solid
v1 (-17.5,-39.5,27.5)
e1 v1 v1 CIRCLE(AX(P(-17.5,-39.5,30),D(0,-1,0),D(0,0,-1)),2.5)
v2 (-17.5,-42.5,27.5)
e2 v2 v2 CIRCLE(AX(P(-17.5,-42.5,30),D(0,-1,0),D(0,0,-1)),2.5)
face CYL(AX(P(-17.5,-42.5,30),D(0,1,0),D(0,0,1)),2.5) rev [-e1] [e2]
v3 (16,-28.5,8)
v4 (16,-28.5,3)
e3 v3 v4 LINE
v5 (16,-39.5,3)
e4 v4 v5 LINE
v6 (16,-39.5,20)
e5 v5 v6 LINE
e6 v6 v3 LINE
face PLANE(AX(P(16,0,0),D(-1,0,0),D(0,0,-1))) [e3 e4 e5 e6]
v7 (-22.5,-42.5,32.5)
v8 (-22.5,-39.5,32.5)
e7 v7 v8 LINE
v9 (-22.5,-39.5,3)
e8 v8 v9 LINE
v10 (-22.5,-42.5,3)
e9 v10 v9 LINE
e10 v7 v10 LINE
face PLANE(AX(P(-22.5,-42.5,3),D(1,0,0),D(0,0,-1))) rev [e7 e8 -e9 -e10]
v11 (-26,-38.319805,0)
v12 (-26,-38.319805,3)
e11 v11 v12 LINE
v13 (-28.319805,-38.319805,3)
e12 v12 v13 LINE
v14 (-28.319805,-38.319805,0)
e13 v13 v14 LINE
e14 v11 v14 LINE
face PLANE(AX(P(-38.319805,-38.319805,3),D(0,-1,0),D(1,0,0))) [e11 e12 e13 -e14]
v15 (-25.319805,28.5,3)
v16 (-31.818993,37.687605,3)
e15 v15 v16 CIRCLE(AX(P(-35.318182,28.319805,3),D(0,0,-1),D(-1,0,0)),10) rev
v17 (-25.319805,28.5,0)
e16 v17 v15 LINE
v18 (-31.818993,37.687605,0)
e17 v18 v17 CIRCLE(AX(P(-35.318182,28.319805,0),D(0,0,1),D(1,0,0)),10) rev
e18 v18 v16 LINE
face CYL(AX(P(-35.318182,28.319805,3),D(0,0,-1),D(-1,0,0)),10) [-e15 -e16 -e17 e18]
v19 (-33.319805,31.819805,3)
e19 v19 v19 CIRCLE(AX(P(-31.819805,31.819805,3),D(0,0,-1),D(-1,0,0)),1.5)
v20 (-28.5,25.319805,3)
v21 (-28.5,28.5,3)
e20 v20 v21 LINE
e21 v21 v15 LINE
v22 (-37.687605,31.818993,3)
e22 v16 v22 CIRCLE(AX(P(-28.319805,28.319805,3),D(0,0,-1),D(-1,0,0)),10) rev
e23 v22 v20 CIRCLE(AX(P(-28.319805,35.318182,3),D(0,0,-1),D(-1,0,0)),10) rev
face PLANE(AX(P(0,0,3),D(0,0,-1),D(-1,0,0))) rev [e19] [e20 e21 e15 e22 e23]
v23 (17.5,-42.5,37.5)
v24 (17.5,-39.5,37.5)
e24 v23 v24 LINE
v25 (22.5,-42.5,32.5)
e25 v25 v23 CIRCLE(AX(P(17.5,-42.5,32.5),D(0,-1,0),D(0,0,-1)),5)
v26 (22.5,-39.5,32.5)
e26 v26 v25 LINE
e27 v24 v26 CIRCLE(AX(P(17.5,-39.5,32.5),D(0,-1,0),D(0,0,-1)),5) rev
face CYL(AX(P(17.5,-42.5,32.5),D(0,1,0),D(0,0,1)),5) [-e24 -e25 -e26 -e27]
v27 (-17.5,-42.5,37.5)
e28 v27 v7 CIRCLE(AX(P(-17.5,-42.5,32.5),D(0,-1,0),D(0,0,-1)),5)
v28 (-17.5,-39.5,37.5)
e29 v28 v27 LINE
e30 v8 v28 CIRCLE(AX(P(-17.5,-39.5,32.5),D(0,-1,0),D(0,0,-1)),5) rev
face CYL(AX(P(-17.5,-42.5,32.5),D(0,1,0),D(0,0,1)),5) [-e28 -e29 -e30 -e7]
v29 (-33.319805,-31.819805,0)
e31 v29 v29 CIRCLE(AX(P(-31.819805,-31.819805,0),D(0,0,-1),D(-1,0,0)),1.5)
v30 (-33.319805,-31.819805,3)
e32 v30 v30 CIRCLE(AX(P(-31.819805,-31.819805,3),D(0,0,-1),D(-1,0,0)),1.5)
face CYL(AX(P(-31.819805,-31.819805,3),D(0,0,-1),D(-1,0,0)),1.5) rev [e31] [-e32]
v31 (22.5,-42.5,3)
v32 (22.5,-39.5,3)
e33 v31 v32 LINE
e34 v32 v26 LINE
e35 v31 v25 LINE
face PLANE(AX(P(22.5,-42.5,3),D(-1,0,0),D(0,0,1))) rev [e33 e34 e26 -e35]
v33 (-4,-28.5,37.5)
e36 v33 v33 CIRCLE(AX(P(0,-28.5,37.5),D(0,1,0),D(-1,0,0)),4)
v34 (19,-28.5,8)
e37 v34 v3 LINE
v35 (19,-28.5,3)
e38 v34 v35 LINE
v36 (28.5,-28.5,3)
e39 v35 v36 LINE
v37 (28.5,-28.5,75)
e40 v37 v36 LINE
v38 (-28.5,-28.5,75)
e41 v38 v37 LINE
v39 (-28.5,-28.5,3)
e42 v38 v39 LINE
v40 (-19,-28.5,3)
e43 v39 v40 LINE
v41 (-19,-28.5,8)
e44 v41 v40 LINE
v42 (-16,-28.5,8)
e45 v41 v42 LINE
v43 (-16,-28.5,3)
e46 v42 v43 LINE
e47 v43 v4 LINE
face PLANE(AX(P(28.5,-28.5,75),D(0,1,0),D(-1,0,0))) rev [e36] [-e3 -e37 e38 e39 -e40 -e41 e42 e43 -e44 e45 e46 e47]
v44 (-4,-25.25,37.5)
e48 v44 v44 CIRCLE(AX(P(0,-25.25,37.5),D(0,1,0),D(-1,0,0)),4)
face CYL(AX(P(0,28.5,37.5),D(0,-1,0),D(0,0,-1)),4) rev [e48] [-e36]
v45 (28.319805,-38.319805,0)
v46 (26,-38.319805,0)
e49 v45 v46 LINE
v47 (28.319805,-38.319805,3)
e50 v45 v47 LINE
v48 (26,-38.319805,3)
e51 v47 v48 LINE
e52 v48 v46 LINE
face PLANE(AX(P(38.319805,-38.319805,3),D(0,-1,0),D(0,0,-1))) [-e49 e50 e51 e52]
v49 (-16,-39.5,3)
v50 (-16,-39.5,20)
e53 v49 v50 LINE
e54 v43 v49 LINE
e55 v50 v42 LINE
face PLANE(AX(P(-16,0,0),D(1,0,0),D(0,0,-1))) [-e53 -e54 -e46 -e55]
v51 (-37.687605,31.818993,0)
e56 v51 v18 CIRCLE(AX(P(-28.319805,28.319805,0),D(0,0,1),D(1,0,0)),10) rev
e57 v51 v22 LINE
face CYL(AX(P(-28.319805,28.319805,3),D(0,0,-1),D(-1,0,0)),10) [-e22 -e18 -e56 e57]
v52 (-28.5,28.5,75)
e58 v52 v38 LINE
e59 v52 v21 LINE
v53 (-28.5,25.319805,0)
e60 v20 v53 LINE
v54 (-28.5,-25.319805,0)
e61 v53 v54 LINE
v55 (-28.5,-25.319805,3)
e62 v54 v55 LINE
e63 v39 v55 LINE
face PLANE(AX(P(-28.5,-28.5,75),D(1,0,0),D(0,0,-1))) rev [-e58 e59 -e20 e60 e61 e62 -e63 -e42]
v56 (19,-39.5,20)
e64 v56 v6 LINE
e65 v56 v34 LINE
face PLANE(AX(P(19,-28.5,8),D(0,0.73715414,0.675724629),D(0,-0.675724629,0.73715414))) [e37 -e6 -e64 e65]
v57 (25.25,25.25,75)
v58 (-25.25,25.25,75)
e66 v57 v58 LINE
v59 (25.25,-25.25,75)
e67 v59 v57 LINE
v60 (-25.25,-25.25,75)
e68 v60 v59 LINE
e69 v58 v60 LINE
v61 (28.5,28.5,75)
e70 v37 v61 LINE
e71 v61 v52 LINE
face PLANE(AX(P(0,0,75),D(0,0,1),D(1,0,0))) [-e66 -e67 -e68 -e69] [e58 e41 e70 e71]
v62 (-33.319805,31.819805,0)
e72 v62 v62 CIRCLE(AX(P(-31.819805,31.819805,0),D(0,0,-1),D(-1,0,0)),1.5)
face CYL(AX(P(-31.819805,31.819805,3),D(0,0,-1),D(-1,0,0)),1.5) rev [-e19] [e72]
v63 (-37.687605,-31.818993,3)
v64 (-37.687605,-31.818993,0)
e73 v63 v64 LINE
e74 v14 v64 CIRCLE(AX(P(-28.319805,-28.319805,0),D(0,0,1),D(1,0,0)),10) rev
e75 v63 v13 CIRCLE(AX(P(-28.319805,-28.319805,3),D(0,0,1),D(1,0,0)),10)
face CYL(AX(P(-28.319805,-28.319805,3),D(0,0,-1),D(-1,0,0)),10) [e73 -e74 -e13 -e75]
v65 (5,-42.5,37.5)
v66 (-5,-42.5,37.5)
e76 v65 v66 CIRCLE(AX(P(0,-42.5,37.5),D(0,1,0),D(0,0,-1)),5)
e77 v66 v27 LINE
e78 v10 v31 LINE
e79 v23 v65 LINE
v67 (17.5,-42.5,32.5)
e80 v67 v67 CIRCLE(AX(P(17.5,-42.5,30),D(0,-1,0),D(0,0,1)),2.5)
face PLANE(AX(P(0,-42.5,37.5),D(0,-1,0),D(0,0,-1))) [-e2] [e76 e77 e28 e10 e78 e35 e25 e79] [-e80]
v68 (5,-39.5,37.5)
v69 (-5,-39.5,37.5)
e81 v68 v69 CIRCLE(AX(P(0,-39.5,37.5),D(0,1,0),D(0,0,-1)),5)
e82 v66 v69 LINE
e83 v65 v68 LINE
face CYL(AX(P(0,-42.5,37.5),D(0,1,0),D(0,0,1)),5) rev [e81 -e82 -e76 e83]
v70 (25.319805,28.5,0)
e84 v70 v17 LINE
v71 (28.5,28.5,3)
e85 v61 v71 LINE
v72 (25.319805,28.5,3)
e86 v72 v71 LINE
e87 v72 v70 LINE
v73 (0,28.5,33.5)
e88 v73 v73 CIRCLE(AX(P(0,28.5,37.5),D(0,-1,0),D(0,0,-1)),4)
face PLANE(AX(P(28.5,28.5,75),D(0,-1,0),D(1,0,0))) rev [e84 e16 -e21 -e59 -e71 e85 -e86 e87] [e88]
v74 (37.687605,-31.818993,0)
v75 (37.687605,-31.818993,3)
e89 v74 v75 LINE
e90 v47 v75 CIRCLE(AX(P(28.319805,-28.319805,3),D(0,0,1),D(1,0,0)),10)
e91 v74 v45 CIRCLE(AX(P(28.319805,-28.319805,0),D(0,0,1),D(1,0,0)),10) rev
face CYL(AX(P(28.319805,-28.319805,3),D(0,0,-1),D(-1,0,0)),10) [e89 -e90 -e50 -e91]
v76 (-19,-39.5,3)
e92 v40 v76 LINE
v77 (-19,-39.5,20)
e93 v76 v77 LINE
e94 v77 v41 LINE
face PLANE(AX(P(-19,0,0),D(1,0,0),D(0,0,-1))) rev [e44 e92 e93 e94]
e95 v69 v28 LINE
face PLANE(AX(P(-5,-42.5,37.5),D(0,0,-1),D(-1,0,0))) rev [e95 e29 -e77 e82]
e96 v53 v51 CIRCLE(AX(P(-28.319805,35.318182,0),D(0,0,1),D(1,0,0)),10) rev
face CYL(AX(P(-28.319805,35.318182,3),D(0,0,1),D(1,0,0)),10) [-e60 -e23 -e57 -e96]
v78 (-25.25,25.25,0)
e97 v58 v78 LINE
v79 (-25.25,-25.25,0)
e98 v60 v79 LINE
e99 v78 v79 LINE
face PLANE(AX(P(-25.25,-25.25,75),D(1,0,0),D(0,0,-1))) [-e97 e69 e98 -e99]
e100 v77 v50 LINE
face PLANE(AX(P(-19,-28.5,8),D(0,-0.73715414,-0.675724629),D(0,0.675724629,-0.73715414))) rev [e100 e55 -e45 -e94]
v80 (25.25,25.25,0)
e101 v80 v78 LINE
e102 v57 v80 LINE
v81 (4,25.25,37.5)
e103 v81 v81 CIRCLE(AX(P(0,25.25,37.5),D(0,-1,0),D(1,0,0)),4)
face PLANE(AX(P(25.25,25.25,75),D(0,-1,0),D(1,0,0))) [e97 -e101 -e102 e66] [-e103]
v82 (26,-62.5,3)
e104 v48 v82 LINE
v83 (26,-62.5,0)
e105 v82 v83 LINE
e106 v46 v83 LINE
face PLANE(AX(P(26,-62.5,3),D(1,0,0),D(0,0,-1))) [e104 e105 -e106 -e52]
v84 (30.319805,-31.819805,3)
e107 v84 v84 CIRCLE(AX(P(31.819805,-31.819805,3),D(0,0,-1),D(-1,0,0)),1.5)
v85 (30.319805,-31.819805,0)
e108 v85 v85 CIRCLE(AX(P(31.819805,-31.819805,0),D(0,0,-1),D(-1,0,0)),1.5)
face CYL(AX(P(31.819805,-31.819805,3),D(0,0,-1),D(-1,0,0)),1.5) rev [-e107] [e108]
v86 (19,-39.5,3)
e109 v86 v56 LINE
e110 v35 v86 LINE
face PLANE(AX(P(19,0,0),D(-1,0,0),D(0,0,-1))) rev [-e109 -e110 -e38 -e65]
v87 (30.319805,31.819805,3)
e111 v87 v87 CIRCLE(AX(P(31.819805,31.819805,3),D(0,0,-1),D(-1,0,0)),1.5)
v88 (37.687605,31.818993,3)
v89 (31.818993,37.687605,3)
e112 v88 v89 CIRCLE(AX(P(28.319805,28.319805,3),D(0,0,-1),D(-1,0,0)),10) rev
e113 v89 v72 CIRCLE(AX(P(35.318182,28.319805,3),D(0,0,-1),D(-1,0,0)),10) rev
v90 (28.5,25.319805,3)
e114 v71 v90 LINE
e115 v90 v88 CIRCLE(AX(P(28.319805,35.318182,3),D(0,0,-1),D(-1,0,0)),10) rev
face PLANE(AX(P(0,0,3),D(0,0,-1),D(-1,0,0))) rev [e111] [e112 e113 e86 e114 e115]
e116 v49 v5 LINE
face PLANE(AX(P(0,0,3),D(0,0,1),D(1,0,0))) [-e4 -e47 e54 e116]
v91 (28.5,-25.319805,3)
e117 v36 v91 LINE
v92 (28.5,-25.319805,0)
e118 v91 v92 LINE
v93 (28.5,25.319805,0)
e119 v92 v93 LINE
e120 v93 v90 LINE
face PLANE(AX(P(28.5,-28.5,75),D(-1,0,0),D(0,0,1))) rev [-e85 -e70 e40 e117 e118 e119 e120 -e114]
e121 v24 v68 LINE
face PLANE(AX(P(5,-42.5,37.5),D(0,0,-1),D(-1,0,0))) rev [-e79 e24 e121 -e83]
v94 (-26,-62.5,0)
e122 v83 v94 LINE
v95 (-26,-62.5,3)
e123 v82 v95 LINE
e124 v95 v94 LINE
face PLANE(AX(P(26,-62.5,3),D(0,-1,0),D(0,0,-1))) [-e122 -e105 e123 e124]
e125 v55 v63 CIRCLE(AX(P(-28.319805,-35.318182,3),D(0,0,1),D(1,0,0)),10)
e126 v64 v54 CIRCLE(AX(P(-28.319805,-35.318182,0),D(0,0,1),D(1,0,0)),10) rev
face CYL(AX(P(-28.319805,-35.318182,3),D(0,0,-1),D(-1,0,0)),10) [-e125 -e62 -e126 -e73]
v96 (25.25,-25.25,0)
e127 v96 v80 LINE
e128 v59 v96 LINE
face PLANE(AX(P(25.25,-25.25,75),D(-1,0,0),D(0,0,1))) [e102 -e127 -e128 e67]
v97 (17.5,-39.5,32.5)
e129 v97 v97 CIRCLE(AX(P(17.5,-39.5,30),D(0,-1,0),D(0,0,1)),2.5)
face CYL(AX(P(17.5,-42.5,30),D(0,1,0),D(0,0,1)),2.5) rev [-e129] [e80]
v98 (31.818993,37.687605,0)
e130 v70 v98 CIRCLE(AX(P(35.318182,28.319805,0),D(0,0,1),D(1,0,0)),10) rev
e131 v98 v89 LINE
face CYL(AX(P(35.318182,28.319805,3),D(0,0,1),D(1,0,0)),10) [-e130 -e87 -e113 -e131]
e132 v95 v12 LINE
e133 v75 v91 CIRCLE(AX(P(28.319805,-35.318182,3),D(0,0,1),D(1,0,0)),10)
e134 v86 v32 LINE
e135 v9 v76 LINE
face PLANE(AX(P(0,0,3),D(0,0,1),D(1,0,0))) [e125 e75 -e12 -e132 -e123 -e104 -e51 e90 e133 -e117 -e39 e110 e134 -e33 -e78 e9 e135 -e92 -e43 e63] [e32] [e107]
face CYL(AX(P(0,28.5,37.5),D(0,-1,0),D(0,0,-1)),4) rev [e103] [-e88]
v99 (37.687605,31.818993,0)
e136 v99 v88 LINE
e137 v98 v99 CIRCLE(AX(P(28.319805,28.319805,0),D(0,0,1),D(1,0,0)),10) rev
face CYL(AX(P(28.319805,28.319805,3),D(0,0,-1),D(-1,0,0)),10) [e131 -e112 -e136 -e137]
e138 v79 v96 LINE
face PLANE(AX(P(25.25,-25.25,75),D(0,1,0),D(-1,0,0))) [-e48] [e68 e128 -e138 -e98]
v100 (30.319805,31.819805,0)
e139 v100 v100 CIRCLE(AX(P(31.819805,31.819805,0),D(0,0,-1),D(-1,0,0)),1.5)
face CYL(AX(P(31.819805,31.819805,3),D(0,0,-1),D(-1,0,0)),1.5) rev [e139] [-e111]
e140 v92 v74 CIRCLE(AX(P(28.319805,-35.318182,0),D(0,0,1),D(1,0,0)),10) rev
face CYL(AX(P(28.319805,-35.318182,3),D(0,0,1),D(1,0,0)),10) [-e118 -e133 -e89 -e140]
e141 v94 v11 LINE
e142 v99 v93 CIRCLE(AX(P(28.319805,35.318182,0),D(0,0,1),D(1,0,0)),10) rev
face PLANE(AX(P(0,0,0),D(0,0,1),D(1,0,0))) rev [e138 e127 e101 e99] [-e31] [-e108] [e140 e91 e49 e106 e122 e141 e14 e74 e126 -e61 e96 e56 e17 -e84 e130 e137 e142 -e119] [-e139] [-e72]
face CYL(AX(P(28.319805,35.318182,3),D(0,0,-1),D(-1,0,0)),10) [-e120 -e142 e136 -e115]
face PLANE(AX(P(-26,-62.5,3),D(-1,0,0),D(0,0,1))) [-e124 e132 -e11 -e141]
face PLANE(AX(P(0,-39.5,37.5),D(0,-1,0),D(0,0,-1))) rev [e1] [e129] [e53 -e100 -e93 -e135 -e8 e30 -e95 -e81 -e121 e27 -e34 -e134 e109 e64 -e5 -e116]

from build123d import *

# Parameters (mm, degrees)
ESQUISSE1_W                  = 57
ESQUISSE1_H                  = 57
ESQUISSE1_W_2                = 50.5
ESQUISSE1_H_2                = 50.5
BOSS_EXTRU_1_DEPTH           = 75
ENL_V_MAT_EXTRU_1_DEPTH      = 99.418748214
ENL_V_MAT_EXTRU_1_DEPTH_BACK = 99.418748214
ESQUISSE2_R                  = 4
ESQUISSE3_W                  = 52
ESQUISSE3_H                  = 34
BOSS_EXTRU_2_DEPTH           = 3
BOSS_EXTRU_3_START           = -23
ESQUISSE4_R                  = 2.5
BOSS_EXTRU_3_DEPTH           = 3
CONG_1_R                     = 5
BOSS_EXTRU_4_START           = -6.5
BOSS_EXTRU_4_DEPTH           = 3
ESQUISSE9_W                  = 13
ESQUISSE9_H                  = 13
ESQUISSE9_R                  = 1.5
BOSS_EXTRU_5_DEPTH           = 3
CONG_2_R                     = 10


with BuildPart() as part:
    # Esquisse1 → Boss.-Extru.1 (new body)
    with BuildSketch(Plane.XY):
        Rectangle(ESQUISSE1_W, ESQUISSE1_H)
        Rectangle(ESQUISSE1_W_2, ESQUISSE1_H_2, mode=Mode.SUBTRACT)
    extrude(amount=BOSS_EXTRU_1_DEPTH)

    # Esquisse2 → Enlèv. mat.-Extru.1 (cut, two sides: drawn at the far end of the back side and taken through both)
    with BuildSketch(Plane.XZ.offset(28.5).offset(-ENL_V_MAT_EXTRU_1_DEPTH_BACK)):
        with Locations(Location((0, 37.5, 0), (0, 0, 270))):
            Circle(ESQUISSE2_R)
    extrude(amount=ENL_V_MAT_EXTRU_1_DEPTH + ENL_V_MAT_EXTRU_1_DEPTH_BACK, mode=Mode.SUBTRACT)

    # Esquisse3 → Boss.-Extru.2 (add)
    with BuildSketch(Plane(origin=(0, 0, 0), x_dir=(-1, 0, 0), z_dir=(0, 0, -1))):
        with Locations((0, -45.5)):
            Rectangle(ESQUISSE3_W, ESQUISSE3_H)
    extrude(amount=-BOSS_EXTRU_2_DEPTH)

    # Esquisse4 → Boss.-Extru.3 (add)
    with BuildSketch(Plane.XZ.offset(62.5).offset(BOSS_EXTRU_3_START)):
        with BuildLine():
            Line((-22.5, 3), (-22.5, 37.5))
            Line((-22.5, 37.5), (-5, 37.5))
            ThreePointArc((-5, 37.5), (0, 32.5), (5, 37.5))
            Line((5, 37.5), (22.5, 37.5))
            Line((22.5, 37.5), (22.5, 3))
            Line((22.5, 3), (-22.5, 3))
        make_face()
        with Locations(Location((-17.5, 30, 0), (0, 0, 270))):
            Circle(ESQUISSE4_R, mode=Mode.SUBTRACT)
        with Locations(Location((17.5, 30, 0), (0, 0, 90))):
            Circle(ESQUISSE4_R, mode=Mode.SUBTRACT)
    extrude(amount=BOSS_EXTRU_3_DEPTH)

    # Congé1
    cong_1_edges = [part.edges().sort_by_distance(p)[0] for p in [
        (-22.5, -41, 37.5),
        (22.5, -41, 37.5),
    ]]
    fillet(cong_1_edges, radius=CONG_1_R)

    # Esquisse8 → Boss.-Extru.4 (add)
    with BuildSketch(Plane.ZY.offset(22.5).offset(BOSS_EXTRU_4_START)):
        Polygon((3, -28.5), (8, -28.5), (20, -39.5), (3, -39.5), align=None)
    boss_extru_4 = extrude(amount=BOSS_EXTRU_4_DEPTH)

    # Symétrie1: Boss.-Extru.4 across plane
    add(boss_extru_4.mirror(Plane(origin=(0, 0, 0), x_dir=(0, 0, 1), z_dir=(1, 0, 0))))

    # Esquisse9 → Boss.-Extru.5 (add)
    # profile 1 of 4: a face of its own
    with BuildSketch(Plane(origin=(0, 0, 0), x_dir=(-1, 0, 0), z_dir=(0, 0, -1))):
        with Locations((-31.819805153, 31.819805153)):
            Rectangle(ESQUISSE9_W, ESQUISSE9_H)
        with Locations((-31.819805153, 31.819805153)):
            Circle(ESQUISSE9_R, mode=Mode.SUBTRACT)
    # profile 2 of 4: a face of its own
    with BuildSketch(Plane(origin=(0, 0, 0), x_dir=(-1, 0, 0), z_dir=(0, 0, -1))):
        with Locations((31.819805153, 31.819805153)):
            Rectangle(ESQUISSE9_W, ESQUISSE9_H)
        with Locations((31.819805153, 31.819805153)):
            Circle(ESQUISSE9_R, mode=Mode.SUBTRACT)
    # profile 3 of 4: a face of its own
    with BuildSketch(Plane(origin=(0, 0, 0), x_dir=(-1, 0, 0), z_dir=(0, 0, -1))):
        with Locations((31.819805153, -31.819805153)):
            Rectangle(ESQUISSE9_W, ESQUISSE9_H)
        with Locations((31.819805153, -31.819805153)):
            Circle(ESQUISSE9_R, mode=Mode.SUBTRACT)
    # profile 4 of 4: a face of its own
    with BuildSketch(Plane(origin=(0, 0, 0), x_dir=(-1, 0, 0), z_dir=(0, 0, -1))):
        with Locations((-31.819805153, -31.819805153)):
            Rectangle(ESQUISSE9_W, ESQUISSE9_H)
        with Locations((-31.819805153, -31.819805153)):
            Circle(ESQUISSE9_R, mode=Mode.SUBTRACT)
    extrude(amount=-BOSS_EXTRU_5_DEPTH)

    # Congé2
    # the kernel refuses this fillet: 10 mm, written as the material it takes off along each edge
    with BuildSketch(Plane(origin=(-38.319805153, -38.319805153, -25), x_dir=(0, 1, 0), z_dir=(0, 0, 1)), Plane(origin=(38.319805153, -38.319805153, -25), x_dir=(-1, 0, 0), z_dir=(0, 0, 1)), Plane(origin=(38.319805153, 38.319805153, -25), x_dir=(0, -1, 0), z_dir=(0, 0, 1)), Plane(origin=(-38.319805153, 38.319805153, -25), x_dir=(1, 0, 0), z_dir=(0, 0, 1))) as cong_2_piece_1:
        with BuildLine():
            CenterArc((CONG_2_R, -CONG_2_R), CONG_2_R, 90, 90)
            Line((0, -CONG_2_R), (-CONG_2_R * 0.02, -CONG_2_R))
            Line((-CONG_2_R * 0.02, -CONG_2_R), (-CONG_2_R * 0.02, CONG_2_R * 0.02))
            Line((-CONG_2_R * 0.02, CONG_2_R * 0.02), (CONG_2_R, CONG_2_R * 0.02))
            Line((CONG_2_R, CONG_2_R * 0.02), (CONG_2_R, 0))
        make_face()
    extrude(amount=53, mode=Mode.SUBTRACT)
    with BuildSketch(Plane(origin=(-38.319805153, -25.319805153, -24.995940898), x_dir=(1, 0, 0), z_dir=(0, 0, 1)), Plane(origin=(38.319805153, 25.319805153, -24.995940898), x_dir=(-1, 0, 0), z_dir=(0, 0, 1)), Plane(origin=(-25.319805153, 38.319805153, -24.995940898), x_dir=(0, -1, 0), z_dir=(0, 0, 1))) as cong_2_piece_2:
        with BuildLine():
            CenterArc((10, -9.998376359), CONG_2_R, 91.032496301, 88.967503699)
            Line((0, -9.998376359), (-0.2, -9.998376359))
            Line((-0.2, -9.998376359), (-0.2, 0))
            Line((-0.2, 0), (0, 0.2))
            ThreePointArc((0, 0.2), (4.909902577, 0.2), (9.816201256, 0.199967527))
            Line((9.816201256, 0.199967527), (9.819805153, 0))
        make_face()
    extrude(amount=52.991881795, mode=Mode.SUBTRACT)
    with BuildSketch(Plane(origin=(38.319805153, -25.319805153, -24.995940898), x_dir=(0, -1, 0), z_dir=(0, 0, 1)), Plane(origin=(25.319805153, 38.319805153, -24.995940898), x_dir=(1, 0, 0), z_dir=(0, 0, 1)), Plane(origin=(-38.319805153, 25.319805153, -24.995940898), x_dir=(0, 1, 0), z_dir=(0, 0, 1))) as cong_2_piece_3:
        with BuildLine():
            CenterArc((9.998376359, -10), CONG_2_R, 90, 88.967503699)
            Line((0, -9.819805153), (-0.199967527, -9.816201256))
            ThreePointArc((-0.199967527, -9.816201256), (-0.2, -4.909902577), (-0.2, 0))
            Line((-0.2, 0), (0, 0.2))
            Line((0, 0.2), (9.998376359, 0.2))
            Line((9.998376359, 0.2), (9.998376359, 0))
        make_face()
    extrude(amount=52.991881795, mode=Mode.SUBTRACT)


solid = part.part
